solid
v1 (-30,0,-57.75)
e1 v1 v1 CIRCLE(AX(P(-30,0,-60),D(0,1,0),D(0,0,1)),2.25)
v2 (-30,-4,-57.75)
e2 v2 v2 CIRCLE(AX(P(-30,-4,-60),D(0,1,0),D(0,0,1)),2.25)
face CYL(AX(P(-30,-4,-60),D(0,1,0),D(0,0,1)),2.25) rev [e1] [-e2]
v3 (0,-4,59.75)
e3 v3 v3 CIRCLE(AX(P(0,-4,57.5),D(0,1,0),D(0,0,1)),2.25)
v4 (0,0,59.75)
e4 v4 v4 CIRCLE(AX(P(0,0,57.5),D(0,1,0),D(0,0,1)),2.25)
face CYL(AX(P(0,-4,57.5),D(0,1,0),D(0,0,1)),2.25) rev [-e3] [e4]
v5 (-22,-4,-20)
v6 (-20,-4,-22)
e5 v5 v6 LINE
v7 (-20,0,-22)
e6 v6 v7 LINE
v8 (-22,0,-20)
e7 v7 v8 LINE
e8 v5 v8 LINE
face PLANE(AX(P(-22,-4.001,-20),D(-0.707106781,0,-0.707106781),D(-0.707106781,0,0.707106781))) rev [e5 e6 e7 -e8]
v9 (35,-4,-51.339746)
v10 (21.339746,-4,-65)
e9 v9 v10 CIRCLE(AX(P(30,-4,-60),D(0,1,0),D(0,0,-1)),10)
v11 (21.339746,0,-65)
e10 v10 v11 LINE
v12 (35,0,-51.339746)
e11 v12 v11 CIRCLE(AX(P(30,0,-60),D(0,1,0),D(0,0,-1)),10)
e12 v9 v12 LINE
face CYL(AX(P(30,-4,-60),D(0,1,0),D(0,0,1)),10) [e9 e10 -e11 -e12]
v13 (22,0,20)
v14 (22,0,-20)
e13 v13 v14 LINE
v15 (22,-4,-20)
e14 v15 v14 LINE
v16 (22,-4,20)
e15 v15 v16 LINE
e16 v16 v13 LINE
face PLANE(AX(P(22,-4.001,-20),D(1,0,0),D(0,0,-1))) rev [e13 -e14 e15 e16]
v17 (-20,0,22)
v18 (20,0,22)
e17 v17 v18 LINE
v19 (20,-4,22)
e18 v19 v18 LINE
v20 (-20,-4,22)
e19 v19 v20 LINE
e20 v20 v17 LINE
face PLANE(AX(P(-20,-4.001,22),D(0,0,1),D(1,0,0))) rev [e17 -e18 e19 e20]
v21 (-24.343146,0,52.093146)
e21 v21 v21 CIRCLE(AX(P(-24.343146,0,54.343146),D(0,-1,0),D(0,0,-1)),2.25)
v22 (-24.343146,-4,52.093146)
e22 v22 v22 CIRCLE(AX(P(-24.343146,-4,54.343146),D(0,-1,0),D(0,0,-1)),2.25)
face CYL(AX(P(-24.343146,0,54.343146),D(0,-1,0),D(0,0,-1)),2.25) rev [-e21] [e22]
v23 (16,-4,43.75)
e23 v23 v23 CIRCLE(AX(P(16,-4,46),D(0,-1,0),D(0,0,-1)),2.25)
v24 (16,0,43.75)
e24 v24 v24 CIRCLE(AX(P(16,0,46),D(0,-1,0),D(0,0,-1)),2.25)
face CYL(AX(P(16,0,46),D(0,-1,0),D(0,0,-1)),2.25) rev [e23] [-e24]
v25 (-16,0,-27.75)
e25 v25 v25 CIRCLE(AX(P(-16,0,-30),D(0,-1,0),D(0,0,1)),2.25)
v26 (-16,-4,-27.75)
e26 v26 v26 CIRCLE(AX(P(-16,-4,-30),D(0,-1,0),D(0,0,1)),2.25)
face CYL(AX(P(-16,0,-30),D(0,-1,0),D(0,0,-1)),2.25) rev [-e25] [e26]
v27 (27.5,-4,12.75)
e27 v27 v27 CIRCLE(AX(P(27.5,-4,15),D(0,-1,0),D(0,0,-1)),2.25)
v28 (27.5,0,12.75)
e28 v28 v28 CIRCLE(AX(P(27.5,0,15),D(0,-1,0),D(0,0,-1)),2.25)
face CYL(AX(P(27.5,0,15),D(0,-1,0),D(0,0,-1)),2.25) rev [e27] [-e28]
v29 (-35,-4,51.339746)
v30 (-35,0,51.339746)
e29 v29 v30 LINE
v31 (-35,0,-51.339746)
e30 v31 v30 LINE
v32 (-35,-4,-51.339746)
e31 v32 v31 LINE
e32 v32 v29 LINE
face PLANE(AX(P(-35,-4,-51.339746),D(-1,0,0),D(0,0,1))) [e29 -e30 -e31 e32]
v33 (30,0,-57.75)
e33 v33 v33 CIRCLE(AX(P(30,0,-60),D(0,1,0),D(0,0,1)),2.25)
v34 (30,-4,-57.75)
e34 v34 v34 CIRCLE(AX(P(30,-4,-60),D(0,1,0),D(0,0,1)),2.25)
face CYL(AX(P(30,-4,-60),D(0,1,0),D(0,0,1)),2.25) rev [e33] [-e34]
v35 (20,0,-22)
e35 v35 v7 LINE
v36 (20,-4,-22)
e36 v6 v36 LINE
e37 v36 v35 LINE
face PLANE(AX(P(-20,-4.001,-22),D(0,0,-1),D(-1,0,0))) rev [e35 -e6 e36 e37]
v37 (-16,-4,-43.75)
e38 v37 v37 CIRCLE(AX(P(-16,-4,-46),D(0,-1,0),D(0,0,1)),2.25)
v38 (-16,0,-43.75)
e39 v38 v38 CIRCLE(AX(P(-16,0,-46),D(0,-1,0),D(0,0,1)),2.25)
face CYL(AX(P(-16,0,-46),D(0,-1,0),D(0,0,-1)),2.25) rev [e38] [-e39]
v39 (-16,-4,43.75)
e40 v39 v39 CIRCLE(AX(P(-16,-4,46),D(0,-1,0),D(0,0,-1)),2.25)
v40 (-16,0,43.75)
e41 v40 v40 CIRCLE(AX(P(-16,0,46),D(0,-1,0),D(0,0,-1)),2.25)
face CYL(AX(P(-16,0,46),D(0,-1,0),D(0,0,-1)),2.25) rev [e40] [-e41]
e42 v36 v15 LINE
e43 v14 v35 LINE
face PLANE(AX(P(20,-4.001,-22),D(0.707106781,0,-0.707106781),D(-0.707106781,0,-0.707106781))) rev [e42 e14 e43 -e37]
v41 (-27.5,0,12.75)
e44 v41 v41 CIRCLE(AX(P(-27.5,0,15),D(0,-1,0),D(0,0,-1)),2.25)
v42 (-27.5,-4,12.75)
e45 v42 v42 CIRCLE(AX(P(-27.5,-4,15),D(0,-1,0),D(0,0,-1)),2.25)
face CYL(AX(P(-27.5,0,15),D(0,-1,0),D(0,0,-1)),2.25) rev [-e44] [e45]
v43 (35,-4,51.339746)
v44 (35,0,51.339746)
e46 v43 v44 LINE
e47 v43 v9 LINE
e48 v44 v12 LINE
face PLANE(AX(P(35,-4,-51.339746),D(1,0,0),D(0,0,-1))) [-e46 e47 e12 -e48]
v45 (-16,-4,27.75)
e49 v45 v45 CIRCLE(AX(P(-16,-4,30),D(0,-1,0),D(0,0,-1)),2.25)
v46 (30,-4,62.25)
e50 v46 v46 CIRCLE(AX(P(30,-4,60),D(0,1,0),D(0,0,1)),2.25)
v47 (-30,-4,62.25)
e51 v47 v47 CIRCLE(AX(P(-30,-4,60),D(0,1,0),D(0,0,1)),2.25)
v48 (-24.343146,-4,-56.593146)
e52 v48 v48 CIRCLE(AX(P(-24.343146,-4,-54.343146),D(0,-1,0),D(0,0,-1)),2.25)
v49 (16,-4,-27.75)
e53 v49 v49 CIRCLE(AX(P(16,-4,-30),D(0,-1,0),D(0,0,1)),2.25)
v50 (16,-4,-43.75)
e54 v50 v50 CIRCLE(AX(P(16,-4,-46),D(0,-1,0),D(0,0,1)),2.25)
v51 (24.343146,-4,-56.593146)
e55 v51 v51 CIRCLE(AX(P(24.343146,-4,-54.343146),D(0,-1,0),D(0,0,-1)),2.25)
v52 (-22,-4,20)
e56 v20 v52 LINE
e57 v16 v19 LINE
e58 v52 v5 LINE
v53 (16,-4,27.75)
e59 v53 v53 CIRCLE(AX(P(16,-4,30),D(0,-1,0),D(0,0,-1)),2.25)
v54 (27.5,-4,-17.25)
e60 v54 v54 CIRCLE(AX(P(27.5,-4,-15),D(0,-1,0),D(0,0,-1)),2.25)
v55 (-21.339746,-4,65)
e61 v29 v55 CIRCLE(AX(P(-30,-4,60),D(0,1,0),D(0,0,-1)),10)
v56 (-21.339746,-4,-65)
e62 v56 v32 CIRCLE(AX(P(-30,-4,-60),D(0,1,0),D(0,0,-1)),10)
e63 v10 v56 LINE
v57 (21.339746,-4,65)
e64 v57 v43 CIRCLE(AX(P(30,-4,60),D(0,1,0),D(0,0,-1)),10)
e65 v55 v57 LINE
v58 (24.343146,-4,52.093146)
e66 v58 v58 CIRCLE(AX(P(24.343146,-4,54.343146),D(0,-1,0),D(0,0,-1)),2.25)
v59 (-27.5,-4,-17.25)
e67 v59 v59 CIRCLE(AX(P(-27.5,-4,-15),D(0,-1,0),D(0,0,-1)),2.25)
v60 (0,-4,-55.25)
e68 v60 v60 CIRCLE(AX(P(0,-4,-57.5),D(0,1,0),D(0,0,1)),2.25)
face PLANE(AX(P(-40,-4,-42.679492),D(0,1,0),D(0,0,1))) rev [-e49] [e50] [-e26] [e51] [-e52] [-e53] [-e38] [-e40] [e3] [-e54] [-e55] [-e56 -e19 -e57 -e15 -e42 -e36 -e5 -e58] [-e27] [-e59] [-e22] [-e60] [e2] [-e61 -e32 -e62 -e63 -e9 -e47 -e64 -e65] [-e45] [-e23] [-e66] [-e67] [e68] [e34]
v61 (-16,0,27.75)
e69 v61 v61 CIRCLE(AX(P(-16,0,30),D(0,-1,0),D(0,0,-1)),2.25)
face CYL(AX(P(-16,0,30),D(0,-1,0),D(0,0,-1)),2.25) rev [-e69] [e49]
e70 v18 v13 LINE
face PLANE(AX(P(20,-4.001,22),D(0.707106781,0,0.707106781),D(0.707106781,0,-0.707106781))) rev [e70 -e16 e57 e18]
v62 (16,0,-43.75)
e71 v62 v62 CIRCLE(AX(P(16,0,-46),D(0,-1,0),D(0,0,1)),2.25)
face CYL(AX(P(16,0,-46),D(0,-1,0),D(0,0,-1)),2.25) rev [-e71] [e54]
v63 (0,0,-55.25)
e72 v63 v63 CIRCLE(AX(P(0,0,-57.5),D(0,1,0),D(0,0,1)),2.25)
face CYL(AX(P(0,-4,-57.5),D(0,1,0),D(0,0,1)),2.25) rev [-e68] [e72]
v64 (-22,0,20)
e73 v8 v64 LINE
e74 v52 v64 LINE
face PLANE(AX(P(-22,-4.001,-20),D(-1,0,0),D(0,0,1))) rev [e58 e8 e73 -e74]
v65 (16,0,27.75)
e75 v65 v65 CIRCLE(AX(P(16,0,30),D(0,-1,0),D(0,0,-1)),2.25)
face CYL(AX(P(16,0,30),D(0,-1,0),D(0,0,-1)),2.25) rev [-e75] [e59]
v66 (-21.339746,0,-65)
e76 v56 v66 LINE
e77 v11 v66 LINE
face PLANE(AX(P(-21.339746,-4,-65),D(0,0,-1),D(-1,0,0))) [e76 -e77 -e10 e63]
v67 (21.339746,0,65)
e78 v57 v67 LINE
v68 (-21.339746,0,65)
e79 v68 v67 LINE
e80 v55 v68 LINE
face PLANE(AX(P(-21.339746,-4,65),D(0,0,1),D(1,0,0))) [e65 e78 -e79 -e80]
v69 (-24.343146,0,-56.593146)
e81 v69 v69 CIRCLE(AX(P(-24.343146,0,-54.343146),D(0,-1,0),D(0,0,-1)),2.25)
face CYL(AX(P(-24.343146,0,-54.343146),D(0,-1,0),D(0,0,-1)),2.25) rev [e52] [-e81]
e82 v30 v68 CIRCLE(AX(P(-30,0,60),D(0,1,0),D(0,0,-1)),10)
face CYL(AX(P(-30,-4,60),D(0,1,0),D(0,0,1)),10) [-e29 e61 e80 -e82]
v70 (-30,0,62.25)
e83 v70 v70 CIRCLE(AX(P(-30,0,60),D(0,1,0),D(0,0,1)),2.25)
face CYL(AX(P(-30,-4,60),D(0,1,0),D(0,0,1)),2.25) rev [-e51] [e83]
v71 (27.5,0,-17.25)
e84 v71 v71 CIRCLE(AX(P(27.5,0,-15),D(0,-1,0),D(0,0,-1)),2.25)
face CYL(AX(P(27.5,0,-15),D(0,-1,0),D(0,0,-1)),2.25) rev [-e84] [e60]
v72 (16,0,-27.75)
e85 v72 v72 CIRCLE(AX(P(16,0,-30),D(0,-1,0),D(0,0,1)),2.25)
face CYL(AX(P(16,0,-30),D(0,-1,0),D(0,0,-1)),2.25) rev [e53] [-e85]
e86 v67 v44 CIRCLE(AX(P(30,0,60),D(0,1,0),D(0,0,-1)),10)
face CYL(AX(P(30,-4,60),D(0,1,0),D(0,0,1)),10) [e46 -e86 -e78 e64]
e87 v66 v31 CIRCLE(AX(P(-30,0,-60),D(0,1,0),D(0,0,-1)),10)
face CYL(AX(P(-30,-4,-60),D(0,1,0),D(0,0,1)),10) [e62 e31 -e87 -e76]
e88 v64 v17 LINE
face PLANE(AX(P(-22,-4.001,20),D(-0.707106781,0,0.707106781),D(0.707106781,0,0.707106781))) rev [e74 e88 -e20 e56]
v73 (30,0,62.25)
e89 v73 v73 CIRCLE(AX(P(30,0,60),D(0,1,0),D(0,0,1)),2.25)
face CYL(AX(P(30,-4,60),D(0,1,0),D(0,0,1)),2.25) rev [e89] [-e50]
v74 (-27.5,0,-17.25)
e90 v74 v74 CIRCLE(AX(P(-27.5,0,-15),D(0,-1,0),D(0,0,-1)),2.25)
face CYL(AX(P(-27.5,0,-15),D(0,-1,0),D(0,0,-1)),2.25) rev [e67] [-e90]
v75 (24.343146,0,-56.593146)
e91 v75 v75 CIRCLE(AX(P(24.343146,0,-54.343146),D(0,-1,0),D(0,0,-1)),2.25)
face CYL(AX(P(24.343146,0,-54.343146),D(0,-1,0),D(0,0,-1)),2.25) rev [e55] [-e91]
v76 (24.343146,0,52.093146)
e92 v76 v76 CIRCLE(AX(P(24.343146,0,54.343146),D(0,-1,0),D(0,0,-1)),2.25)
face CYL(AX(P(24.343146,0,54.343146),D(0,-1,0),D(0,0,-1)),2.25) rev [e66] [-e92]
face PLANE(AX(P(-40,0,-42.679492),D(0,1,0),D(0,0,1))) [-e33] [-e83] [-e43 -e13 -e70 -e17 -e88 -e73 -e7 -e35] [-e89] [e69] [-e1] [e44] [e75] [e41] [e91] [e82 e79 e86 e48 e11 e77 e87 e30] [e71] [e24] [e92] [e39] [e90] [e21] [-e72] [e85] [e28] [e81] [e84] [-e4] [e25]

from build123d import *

# Parameters (mm, degrees)
SKETCH1_R          = 2.25
BASE_FLANGE1_DEPTH = 4
CUT_EXTRUDE1_REACH = 82.722
SKETCH5_R          = 2.25
CUT_EXTRUDE2_DEPTH = 81.721744282
SKETCH6_R          = 2.25
CUT_EXTRUDE3_DEPTH = 81.721744282
SKETCH7_W          = 5
SKETCH7_H          = 102.679491924
SKETCH7_W_2        = 42.679491924
SKETCH7_H_2        = 5
TAB1_DEPTH         = 4
SKETCH8_R          = 2.25
CUT_EXTRUDE4_DEPTH = 81.721744282
SKETCH9_R          = 2.25
CUT_EXTRUDE5_DEPTH = 81.721744282


# Sheet-metal steps are written as plain solids
with BuildPart() as part:
    # Sketch1 → Base-Flange1 (new body)
    with BuildSketch(Plane(origin=(0, 0, 0), x_dir=(1, 0, 0), z_dir=(0, 1, 0))):
        with BuildLine():
            Line((-30, 0), (-30, 42.679491924))
            ThreePointArc((-30, 42.679491924), (-31.339745962, 47.679491924), (-35, 51.339745962))
            ThreePointArc((-35, 51.339745962), (-37.071067812, 67.071067812), (-21.339745962, 65))
            ThreePointArc((-21.339745962, 65), (-17.679491924, 61.339745962), (-12.679491924, 60))
            Line((-12.679491924, 60), (0, 60))
            Line((0, 60), (12.679491924, 60))
            ThreePointArc((12.679491924, 60), (17.679491924, 61.339745962), (21.339745962, 65))
            ThreePointArc((21.339745962, 65), (37.071067812, 67.071067812), (35, 51.339745962))
            ThreePointArc((35, 51.339745962), (31.339745962, 47.679491924), (30, 42.679491924))
            Line((30, 42.679491924), (30, 0))
            Line((30, 0), (30, -42.679491924))
            ThreePointArc((30, -42.679491924), (31.339745962, -47.679491924), (35, -51.339745962))
            ThreePointArc((35, -51.339745962), (37.071067812, -67.071067812), (21.339745962, -65))
            ThreePointArc((21.339745962, -65), (17.679491924, -61.339745962), (12.679491924, -60))
            Line((12.679491924, -60), (0, -60))
            Line((0, -60), (-12.679491924, -60))
            ThreePointArc((-12.679491924, -60), (-17.679491924, -61.339745962), (-21.339745962, -65))
            ThreePointArc((-21.339745962, -65), (-37.071067812, -67.071067812), (-35, -51.339745962))
            ThreePointArc((-35, -51.339745962), (-31.339745962, -47.679491924), (-30, -42.679491924))
            Line((-30, -42.679491924), (-30, 0))
        make_face()
        with Locations(Location((-30, 60, 0), (0, 0, 270))):
            Circle(SKETCH1_R, mode=Mode.SUBTRACT)
        with Locations(Location((30, 60, 0), (0, 0, 270))):
            Circle(SKETCH1_R, mode=Mode.SUBTRACT)
        with Locations(Location((30, -60, 0), (0, 0, 270))):
            Circle(SKETCH1_R, mode=Mode.SUBTRACT)
        with Locations(Location((-30, -60, 0), (0, 0, 270))):
            Circle(SKETCH1_R, mode=Mode.SUBTRACT)
    extrude(amount=-BASE_FLANGE1_DEPTH)

    # Sketch4 → Cut-Extrude1 (cut, up to next)
    with BuildSketch(Plane(origin=(0, 0, 0), x_dir=(1, 0, 0), z_dir=(0, 1, 0)), mode=Mode.PRIVATE) as cut_extrude1_sk1:
        Polygon((-20, 22), (20, 22), (22, 20), (22, -20), (20, -22), (-20, -22), (-22, -20), (-22, 20), align=None)
    cut_extrude1_tool1 = extrude(cut_extrude1_sk1.sketch, amount=-CUT_EXTRUDE1_REACH, mode=Mode.PRIVATE) & part.part
    add(cut_extrude1_tool1.solids().sort_by_distance((0, 0, 0))[0], mode=Mode.SUBTRACT)

    # Sketch5 → Cut-Extrude2 (cut, through all)
    with BuildSketch(Plane.XZ.offset(4)):
        with Locations(Location((-24.343145751, 54.343145751, 0), (0, 0, 270))):
            Circle(SKETCH5_R)
        with Locations(Location((24.343145751, 54.343145751, 0), (0, 0, 270))):
            Circle(SKETCH5_R)
        with Locations(Location((24.343145751, -54.343145751, 0), (0, 0, 270))):
            Circle(SKETCH5_R)
        with Locations(Location((-24.343145751, -54.343145751, 0), (0, 0, 270))):
            Circle(SKETCH5_R)
    extrude(amount=-CUT_EXTRUDE2_DEPTH, mode=Mode.SUBTRACT)

    # Sketch6 → Cut-Extrude3 (cut, through all)
    with BuildSketch(Plane.XZ.offset(4)):
        with Locations(Location((-27.5, -15, 0), (0, 0, 270))):
            Circle(SKETCH6_R)
        with Locations(Location((-27.5, 15, 0), (0, 0, 270))):
            Circle(SKETCH6_R)
        with Locations(Location((27.5, 15, 0), (0, 0, 270))):
            Circle(SKETCH6_R)
        with Locations(Location((27.5, -15, 0), (0, 0, 270))):
            Circle(SKETCH6_R)
    extrude(amount=-CUT_EXTRUDE3_DEPTH, mode=Mode.SUBTRACT)

    # Sketch7 → Tab1 (add)
    with BuildSketch(Plane(origin=(0, 0, 0), x_dir=(1, 0, 0), z_dir=(0, 1, 0))):
        with Locations((-32.5, 0)):
            Rectangle(SKETCH7_W, SKETCH7_H)
        with Locations((32.5, 0)):
            Rectangle(SKETCH7_W, SKETCH7_H)
        with Locations((0, -62.5)):
            Rectangle(SKETCH7_W_2, SKETCH7_H_2)
        with Locations((0, 62.5)):
            Rectangle(SKETCH7_W_2, SKETCH7_H_2)
    extrude(amount=-TAB1_DEPTH)

    # Sketch8 → Cut-Extrude4 (cut, through all)
    with BuildSketch(Plane.XZ.offset(4)):
        with Locations(Location((-16, 46, 0), (0, 0, 270))):
            Circle(SKETCH8_R)
        with Locations(Location((-16, 30, 0), (0, 0, 270))):
            Circle(SKETCH8_R)
        with Locations(Location((16, 46, 0), (0, 0, 270))):
            Circle(SKETCH8_R)
        with Locations(Location((16, 30, 0), (0, 0, 270))):
            Circle(SKETCH8_R)
        with Locations(Location((16, -30, 0), (0, 0, 90))):
            Circle(SKETCH8_R)
        with Locations(Location((16, -46, 0), (0, 0, 90))):
            Circle(SKETCH8_R)
        with Locations(Location((-16, -30, 0), (0, 0, 90))):
            Circle(SKETCH8_R)
        with Locations(Location((-16, -46, 0), (0, 0, 90))):
            Circle(SKETCH8_R)
    extrude(amount=-CUT_EXTRUDE4_DEPTH, mode=Mode.SUBTRACT)

    # Sketch9 → Cut-Extrude5 (cut, through all)
    with BuildSketch(Plane(origin=(0, 0, 0), x_dir=(1, 0, 0), z_dir=(0, 1, 0))):
        with Locations(Location((0, 57.5, 0), (0, 0, 270))):
            Circle(SKETCH9_R)
        with Locations(Location((0, -57.5, 0), (0, 0, 270))):
            Circle(SKETCH9_R)
    extrude(amount=-CUT_EXTRUDE5_DEPTH, mode=Mode.SUBTRACT)


solid = part.part
